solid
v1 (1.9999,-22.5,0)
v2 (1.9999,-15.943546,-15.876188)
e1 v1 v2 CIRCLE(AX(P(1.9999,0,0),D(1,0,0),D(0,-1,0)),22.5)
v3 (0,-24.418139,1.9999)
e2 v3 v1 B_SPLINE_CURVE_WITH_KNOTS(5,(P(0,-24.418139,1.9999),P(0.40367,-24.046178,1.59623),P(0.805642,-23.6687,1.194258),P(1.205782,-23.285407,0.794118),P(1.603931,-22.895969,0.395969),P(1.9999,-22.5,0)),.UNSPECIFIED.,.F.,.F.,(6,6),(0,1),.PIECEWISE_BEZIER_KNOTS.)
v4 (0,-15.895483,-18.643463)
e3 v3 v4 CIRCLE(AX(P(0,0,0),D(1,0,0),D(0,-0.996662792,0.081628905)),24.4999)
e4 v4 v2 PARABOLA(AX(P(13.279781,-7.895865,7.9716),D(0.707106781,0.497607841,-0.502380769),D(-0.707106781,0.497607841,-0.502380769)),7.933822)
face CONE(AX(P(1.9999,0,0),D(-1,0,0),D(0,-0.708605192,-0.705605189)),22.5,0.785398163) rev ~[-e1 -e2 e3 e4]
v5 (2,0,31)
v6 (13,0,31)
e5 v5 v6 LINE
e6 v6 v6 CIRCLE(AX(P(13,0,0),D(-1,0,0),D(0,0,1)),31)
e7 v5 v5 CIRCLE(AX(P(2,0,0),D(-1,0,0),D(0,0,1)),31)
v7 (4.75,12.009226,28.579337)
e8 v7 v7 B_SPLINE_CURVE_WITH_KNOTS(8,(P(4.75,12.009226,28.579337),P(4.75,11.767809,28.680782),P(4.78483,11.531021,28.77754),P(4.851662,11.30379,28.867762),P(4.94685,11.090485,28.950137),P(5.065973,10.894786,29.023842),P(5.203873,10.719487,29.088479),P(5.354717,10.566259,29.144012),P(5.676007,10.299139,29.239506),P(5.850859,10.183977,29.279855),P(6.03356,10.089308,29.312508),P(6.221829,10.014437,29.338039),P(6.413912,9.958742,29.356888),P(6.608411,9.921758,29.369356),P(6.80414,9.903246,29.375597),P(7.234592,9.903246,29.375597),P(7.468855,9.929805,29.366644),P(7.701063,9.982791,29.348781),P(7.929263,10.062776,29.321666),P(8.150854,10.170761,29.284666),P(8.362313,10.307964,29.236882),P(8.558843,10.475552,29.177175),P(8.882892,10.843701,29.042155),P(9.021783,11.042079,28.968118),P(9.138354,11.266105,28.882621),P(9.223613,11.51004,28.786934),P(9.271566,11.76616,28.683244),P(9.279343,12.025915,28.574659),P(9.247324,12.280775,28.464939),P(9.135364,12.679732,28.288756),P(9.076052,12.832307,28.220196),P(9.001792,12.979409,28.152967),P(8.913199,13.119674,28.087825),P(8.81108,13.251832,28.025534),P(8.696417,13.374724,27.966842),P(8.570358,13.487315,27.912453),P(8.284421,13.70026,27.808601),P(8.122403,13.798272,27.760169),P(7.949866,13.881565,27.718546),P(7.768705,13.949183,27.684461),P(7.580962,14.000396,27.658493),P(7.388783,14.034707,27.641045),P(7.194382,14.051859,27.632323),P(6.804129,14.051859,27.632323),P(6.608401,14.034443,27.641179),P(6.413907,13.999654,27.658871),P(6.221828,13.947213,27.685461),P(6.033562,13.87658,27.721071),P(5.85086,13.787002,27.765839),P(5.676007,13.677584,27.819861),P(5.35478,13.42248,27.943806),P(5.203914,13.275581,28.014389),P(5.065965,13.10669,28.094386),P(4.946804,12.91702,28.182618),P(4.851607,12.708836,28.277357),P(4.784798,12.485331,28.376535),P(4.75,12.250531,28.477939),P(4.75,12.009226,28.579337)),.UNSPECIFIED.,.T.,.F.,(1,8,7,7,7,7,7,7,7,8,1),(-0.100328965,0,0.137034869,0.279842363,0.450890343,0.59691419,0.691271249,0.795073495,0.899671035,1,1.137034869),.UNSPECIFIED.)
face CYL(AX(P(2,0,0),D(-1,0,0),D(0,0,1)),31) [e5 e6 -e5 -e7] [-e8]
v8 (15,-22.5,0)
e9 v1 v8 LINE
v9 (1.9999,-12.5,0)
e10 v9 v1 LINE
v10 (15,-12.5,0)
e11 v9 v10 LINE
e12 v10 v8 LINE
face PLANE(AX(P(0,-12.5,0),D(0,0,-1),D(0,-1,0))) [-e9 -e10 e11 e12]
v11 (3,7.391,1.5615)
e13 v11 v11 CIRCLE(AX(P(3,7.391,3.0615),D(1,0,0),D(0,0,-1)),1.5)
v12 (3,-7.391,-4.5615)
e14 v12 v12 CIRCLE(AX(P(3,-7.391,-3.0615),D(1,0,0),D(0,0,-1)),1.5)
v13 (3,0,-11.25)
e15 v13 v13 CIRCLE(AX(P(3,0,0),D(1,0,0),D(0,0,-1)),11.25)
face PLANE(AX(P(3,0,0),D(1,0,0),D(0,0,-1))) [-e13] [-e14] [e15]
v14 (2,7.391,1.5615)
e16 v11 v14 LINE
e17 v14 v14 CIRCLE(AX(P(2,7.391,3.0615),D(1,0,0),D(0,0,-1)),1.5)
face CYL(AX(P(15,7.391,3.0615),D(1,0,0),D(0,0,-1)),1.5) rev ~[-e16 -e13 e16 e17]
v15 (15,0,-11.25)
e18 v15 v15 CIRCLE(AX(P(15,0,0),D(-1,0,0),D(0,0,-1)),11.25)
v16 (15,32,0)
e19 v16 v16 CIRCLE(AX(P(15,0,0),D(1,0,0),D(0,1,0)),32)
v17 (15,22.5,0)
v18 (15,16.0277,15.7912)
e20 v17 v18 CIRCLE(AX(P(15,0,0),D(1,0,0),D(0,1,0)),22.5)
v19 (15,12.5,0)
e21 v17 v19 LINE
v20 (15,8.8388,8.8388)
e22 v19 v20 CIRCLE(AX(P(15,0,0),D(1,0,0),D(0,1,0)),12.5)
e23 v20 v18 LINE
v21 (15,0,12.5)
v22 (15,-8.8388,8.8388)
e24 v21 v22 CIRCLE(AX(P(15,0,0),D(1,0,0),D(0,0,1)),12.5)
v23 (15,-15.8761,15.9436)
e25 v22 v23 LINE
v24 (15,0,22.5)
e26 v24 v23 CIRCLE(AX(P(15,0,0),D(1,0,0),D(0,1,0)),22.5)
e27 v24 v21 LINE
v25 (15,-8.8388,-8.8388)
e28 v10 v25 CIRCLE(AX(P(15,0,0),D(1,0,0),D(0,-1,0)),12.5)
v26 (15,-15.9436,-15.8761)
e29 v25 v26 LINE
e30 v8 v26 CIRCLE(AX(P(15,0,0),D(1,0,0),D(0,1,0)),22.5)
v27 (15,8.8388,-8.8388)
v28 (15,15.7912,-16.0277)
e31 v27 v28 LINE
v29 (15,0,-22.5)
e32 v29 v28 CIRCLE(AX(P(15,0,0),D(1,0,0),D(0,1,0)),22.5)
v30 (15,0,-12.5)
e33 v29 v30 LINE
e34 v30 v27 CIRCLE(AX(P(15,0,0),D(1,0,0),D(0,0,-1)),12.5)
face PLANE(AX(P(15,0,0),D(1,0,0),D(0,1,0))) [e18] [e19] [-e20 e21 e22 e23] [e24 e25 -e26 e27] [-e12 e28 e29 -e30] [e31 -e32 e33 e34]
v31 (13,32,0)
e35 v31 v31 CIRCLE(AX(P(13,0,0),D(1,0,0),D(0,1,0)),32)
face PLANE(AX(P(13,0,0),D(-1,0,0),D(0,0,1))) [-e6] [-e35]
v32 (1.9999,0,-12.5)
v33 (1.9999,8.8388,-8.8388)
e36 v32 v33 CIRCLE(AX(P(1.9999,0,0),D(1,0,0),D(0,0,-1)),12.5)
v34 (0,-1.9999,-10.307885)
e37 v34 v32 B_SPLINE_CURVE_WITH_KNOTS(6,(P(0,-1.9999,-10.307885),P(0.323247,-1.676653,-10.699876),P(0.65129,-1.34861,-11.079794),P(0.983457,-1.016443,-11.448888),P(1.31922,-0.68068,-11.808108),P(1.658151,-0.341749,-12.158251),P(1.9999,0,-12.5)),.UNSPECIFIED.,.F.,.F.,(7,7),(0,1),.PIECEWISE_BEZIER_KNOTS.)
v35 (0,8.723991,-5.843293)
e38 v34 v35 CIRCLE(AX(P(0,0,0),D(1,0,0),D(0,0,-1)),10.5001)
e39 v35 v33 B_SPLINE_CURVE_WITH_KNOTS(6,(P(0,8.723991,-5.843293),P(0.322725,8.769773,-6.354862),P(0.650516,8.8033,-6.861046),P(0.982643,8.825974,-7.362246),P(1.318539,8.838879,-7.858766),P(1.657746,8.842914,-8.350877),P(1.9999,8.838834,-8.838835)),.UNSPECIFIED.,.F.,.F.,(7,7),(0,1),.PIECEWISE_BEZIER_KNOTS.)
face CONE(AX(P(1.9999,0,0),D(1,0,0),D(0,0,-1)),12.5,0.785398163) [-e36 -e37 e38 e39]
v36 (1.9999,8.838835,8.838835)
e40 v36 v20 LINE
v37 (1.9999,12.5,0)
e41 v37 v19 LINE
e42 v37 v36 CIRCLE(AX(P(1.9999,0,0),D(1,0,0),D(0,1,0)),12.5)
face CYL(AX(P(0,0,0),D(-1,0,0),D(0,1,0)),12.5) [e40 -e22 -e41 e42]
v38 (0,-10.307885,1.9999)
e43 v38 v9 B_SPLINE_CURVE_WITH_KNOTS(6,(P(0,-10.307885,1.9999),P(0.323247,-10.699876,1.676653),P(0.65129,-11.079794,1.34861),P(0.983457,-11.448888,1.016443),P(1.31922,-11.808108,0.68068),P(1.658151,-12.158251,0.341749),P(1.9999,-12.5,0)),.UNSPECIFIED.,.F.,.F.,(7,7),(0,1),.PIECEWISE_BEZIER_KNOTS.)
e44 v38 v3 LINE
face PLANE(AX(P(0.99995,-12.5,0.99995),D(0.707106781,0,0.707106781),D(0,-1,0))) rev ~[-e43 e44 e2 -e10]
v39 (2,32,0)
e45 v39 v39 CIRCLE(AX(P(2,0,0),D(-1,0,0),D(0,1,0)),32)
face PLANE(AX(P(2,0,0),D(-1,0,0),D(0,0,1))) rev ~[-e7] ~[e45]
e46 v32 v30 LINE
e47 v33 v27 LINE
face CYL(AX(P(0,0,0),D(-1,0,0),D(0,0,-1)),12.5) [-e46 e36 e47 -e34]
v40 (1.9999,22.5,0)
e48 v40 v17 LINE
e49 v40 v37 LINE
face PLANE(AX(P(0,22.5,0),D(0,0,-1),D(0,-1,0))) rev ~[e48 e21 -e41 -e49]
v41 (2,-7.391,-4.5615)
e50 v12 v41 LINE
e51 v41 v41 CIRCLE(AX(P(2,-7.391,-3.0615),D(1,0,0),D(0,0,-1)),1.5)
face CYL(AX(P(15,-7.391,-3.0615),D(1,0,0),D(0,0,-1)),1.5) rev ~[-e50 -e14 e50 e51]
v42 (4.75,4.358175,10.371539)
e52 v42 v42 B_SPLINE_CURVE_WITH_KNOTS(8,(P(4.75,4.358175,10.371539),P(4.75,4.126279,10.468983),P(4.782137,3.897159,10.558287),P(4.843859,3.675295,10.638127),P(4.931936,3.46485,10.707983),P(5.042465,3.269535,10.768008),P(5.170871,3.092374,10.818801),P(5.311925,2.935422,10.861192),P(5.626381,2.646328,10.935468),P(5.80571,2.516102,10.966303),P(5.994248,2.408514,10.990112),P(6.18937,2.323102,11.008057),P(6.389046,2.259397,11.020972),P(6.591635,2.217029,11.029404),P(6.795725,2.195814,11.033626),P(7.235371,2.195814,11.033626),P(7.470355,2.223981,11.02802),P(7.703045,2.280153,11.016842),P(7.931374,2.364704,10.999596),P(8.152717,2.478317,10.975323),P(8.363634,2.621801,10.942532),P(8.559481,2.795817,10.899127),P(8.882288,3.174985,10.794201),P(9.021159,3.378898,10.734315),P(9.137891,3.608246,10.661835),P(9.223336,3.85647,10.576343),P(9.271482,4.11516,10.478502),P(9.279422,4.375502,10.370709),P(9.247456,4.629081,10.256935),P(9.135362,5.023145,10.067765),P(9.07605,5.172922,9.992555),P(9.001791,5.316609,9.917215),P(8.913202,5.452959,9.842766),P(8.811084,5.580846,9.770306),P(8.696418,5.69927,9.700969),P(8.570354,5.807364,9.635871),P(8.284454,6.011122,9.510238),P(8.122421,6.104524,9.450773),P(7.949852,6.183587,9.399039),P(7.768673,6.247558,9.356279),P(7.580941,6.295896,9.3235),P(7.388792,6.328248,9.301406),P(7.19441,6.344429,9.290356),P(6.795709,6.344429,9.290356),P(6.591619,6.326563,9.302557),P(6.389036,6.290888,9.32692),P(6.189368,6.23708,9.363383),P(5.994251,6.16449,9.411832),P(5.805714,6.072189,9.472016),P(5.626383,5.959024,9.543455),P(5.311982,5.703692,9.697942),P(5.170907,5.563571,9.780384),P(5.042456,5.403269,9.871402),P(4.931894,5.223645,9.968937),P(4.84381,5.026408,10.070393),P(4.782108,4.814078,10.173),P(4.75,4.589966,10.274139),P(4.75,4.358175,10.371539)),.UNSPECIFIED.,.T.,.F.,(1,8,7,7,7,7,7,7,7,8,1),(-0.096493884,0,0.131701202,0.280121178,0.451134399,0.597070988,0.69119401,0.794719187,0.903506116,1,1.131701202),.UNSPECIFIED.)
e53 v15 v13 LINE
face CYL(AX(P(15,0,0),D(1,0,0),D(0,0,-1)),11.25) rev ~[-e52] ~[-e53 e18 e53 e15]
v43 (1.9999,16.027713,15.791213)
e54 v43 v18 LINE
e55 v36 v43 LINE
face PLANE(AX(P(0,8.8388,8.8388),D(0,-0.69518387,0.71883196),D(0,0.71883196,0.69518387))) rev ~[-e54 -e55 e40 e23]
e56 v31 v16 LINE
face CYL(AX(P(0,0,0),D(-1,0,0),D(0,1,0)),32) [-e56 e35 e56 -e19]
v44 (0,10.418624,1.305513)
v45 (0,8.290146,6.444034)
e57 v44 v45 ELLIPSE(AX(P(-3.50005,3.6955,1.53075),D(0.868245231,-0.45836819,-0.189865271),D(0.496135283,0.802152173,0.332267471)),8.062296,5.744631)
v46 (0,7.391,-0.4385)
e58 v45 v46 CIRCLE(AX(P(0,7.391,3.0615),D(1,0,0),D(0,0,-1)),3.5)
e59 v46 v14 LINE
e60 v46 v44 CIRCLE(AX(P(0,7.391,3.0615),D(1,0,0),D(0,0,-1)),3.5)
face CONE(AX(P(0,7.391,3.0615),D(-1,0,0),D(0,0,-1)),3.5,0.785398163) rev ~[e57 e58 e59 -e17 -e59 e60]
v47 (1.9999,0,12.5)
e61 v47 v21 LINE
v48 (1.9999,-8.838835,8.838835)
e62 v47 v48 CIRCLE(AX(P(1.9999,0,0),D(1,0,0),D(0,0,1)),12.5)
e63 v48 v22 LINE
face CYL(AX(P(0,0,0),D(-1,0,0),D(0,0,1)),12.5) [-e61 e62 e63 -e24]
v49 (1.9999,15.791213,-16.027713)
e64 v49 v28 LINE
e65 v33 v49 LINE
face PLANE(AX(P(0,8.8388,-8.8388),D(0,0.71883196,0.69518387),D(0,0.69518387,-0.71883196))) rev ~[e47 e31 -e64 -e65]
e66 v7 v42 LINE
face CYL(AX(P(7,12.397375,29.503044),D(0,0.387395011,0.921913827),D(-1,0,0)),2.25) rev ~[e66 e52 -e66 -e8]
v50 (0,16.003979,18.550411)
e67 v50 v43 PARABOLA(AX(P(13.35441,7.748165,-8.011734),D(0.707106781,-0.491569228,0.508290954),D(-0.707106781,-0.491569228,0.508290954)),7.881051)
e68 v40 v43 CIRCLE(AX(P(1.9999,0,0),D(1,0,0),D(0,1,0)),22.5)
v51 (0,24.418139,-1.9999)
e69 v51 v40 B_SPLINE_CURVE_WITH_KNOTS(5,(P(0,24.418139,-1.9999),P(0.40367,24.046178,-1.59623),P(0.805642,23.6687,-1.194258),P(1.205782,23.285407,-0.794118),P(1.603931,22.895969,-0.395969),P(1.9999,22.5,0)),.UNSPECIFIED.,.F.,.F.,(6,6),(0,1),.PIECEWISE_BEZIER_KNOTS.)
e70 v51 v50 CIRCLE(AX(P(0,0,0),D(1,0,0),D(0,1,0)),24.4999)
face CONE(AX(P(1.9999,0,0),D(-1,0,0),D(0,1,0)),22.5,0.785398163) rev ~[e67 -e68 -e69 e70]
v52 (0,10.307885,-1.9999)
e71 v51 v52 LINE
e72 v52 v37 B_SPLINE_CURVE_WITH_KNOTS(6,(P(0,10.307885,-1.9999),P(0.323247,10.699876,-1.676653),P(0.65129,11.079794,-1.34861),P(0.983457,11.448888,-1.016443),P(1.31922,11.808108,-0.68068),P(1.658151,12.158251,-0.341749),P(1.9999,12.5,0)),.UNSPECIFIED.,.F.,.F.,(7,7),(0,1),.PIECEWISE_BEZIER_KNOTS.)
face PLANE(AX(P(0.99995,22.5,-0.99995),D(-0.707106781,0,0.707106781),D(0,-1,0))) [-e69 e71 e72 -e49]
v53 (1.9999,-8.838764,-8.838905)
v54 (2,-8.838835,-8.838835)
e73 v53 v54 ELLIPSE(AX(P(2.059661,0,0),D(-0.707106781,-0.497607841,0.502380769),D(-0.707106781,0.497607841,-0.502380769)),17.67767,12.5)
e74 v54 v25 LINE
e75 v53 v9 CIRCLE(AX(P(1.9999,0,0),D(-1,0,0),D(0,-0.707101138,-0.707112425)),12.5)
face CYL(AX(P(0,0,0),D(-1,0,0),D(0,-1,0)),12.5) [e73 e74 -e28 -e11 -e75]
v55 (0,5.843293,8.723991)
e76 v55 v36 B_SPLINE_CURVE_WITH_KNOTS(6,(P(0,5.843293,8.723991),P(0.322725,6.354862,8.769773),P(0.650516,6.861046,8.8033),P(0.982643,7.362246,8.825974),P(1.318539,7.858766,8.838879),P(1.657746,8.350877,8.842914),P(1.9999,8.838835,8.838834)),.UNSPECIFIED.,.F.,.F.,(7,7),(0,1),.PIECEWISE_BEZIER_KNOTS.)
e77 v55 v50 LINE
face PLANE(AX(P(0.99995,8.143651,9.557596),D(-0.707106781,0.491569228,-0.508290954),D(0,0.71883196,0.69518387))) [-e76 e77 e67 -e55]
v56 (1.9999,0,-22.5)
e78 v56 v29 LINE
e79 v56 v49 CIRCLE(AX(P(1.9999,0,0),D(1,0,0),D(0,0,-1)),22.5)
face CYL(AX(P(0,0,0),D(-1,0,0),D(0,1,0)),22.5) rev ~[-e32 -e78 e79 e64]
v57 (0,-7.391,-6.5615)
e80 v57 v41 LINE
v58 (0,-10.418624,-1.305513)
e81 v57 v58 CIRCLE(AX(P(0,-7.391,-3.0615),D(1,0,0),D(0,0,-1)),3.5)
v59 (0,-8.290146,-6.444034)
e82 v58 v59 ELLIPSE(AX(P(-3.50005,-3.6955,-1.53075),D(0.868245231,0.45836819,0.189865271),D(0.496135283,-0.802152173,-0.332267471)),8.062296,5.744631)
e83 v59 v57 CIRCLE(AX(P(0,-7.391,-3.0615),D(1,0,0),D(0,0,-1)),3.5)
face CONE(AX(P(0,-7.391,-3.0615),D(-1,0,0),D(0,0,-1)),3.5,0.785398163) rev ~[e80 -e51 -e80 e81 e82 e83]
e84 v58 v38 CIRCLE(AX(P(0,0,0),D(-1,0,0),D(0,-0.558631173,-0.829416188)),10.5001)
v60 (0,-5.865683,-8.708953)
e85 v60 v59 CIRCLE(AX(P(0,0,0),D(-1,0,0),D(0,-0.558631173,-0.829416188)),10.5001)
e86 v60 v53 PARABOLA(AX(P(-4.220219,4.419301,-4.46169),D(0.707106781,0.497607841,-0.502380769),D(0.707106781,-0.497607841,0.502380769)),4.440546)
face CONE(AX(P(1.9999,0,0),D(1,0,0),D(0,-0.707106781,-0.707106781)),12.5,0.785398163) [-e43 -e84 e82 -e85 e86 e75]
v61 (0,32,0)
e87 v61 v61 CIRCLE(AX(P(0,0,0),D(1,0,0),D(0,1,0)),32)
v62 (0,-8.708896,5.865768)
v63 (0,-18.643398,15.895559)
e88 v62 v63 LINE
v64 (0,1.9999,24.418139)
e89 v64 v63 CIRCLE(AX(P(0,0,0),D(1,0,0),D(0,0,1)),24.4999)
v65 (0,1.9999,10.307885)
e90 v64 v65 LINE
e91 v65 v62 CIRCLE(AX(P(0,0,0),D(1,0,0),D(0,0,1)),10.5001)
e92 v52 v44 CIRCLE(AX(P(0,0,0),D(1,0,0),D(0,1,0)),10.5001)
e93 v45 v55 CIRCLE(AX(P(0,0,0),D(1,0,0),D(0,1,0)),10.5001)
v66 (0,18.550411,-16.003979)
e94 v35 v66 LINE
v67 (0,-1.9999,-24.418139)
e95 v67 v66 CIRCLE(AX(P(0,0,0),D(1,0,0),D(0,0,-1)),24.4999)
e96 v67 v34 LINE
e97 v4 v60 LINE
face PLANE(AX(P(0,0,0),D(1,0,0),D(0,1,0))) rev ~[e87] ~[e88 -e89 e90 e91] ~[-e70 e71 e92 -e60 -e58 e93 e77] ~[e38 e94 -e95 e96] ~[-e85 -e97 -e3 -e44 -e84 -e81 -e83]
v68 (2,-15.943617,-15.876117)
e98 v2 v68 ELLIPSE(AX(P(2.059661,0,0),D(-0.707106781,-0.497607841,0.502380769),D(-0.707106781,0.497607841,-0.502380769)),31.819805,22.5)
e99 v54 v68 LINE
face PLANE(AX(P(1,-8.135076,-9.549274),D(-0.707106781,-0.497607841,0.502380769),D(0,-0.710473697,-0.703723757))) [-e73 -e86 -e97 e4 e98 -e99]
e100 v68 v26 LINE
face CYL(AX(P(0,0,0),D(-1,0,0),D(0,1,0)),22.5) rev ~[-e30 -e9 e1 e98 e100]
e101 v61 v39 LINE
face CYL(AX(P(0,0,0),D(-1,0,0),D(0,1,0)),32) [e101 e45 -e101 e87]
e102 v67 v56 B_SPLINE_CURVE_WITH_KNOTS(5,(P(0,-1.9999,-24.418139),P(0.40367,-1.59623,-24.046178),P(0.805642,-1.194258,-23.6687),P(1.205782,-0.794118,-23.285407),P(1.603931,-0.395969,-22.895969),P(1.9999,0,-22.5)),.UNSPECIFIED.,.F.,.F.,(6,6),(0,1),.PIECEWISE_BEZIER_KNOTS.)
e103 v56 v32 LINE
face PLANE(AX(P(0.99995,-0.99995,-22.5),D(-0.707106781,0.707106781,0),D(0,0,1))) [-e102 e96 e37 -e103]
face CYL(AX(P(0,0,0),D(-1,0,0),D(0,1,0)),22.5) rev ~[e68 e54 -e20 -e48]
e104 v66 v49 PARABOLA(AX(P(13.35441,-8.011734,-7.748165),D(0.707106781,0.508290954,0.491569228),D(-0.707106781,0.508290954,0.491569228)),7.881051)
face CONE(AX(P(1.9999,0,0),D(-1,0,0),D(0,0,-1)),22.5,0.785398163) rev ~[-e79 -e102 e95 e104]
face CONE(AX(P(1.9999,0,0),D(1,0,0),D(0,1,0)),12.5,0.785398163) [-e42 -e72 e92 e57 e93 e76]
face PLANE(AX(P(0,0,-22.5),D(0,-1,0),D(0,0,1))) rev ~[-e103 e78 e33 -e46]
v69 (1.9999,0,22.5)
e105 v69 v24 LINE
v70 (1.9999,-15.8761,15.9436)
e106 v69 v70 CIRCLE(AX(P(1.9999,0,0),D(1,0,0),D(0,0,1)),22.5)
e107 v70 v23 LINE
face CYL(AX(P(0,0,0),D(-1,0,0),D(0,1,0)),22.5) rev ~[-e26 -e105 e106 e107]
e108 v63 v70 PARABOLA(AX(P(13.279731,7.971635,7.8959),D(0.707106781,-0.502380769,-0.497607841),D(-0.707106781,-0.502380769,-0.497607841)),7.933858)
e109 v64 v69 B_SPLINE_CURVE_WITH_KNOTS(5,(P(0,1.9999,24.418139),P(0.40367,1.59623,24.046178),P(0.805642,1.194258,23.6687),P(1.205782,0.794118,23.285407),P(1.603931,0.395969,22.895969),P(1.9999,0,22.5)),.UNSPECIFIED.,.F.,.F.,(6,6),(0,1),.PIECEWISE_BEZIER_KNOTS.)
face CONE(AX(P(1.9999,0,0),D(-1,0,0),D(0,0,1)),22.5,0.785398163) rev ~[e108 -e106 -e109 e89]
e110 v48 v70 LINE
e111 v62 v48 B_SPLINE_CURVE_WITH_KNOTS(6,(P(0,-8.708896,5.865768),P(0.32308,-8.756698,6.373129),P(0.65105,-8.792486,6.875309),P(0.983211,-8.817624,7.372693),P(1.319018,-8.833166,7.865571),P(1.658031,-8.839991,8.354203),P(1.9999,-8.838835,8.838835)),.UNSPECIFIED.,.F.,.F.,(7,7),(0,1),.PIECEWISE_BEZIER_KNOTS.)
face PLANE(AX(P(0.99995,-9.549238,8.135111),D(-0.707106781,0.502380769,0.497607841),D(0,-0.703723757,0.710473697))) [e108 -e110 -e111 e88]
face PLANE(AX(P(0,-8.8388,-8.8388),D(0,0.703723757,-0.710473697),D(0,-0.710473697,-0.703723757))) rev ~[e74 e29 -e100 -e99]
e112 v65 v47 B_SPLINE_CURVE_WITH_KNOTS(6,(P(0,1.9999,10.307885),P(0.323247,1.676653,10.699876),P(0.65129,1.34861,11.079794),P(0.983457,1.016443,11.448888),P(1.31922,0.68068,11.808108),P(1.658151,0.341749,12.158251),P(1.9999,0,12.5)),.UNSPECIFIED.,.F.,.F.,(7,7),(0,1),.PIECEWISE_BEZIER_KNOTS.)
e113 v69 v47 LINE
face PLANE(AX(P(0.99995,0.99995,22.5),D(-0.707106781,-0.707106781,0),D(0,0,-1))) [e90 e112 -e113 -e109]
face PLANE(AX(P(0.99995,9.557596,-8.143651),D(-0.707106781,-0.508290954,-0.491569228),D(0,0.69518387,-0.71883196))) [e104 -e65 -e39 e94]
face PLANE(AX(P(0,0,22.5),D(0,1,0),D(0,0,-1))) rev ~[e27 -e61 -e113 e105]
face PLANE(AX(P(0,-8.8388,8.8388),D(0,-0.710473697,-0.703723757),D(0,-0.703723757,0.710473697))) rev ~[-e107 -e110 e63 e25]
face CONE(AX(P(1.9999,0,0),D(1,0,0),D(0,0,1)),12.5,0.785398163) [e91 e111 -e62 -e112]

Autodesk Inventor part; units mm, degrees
ref_plane "XZ Plane" through (0, 0, 0) normal (0, 1, 0) x (-1, 0, 0)
ref_plane "XY Plane" through (0, 0, 0) normal (0, 0, 1) x (1, 0, 0)
sketch "Эскиз1" plane through (0, 0, 0) normal (1, 0, 0) x (0, 1, 0)
  circle A0 centre (0, 0) radius 33
  circle A1 centre (0, 0) radius 27.5
  line L0 (27.5, 0) -> (12.5, 0)
  line L1 (0, 27.5) -> (0, 12.5)
  arc A2 (0, -12.5) -> (12.5, 0) centre (0, 0) ccw
  arc A3 (-12.5, 0) -> (0, -12.5) centre (0, 0) ccw
  arc A4 (0, 12.5) -> (-12.5, 0) centre (0, 0) ccw
  arc A5 (12.5, 0) -> (0, 12.5) centre (0, 0) ccw
  line L2 (27.5, 0) -> (22.5, 0)
  line L3 (0, -27.5) -> (0, -22.5)
  line L4 (27.5, 0) -> (22.5, 0)
  line L5 (0, 27.5) -> (0, 22.5)
  line L6 (-27.5, 0) -> (-22.5, 0)
  circle A6 centre (0, 0) radius 22.5
  line L7 (-8.8388, -8.8388) -> (-15.9436, -15.8761)
  line L8 (-12.5, 0) -> (-22.5, 0)
  line L9 (-8.8388, 8.8388) -> (-15.8761, 15.9436)
  line L10 (8.8388, 8.8388) -> (16.0277, 15.7912)
  line L11 (12.5, 0) -> (22.5, 0)
  line L12 (0, 12.5) -> (0, 22.5)
  line L13 (8.8388, -8.8388) -> (15.7912, -16.0277)
  line L14 (0, -22.5) -> (0, -12.5)
  circle A7 centre (0, 0) radius 27.5
  circle A8 centre (0, 0) radius 32
  point P0 (-27.5, 0)
  point P1 (0, 22.5)
  point P2 (0, 22.5)
  point P3 (-22.5, 0)
  point P4 (-22.5, 0)
  dimension "d2" = 15
  dimension "d3" = 15
  dimension "d4" = 15
  dimension "d5" = 15
  dimension "d21" = 5
  dimension "d22" = 5
  dimension "d25" = 360
  dimension "d67" = 64
extrude "Выдавливание1" add sketch "Эскиз1" along normal blind 15 contours L0 A6 L1 A1 | A1 L3 A6 L0 | L1 A6 L6 A1 | A1 L6 A6 L3 | A6 L13 A2 L0 | L0 A5 L10 A6 | A6 L10 A5 L1 | L1 A4 L9 A6 | L14 A2 L13 A6 | A6 L7 A3 L14 | A2 A3 A4 A5 | L8 A3 L7 A6 | A6 L9 A4 L8 | A8
sketch "Эскиз5" plane through (15, 0, 0) normal (1, 0, 0) x (0, 0, -1)
  point P0 (0, 0)
extrude "Выдавливание3" cut sketch "Эскиз1" along normal blind 15 contours L0 A5 L10 A6 | L1 A4 L9 A6 | L14 A2 L13 A6 | L8 A3 L7 A6
sketch "Эскиз6" plane through (15, 0, 0) normal (1, 0, 0) x (0, 0, -1)
  circle A0 centre (0, 0) radius 11.25
  arc A1 (0, 12.5) -> (-8.8388, 8.8388) centre (0, 0) ccw projected
  arc A2 (0, 12.5) -> (-8.8388, 8.8388) centre (0, 0) ccw
  line L0 (0, 0) -> (-3.0615, 7.391) construction
  circle A3 centre (-3.0615, 7.391) radius 1.5
  circle A4 centre (-7.391, -3.0615) radius 1.5
  circle A5 centre (3.0615, -7.391) radius 1.5
  circle A6 centre (7.391, 3.0615) radius 1.5
  arc A7 (-3.0615, 7.391) -> (-7.391, -3.0615) centre (0, 0) ccw
  line L1 (-8.8388, 8.8388) -> (-22.3952, 22.8573) construction
  circle A8 centre (0, 0) radius 32 construction
  line L2 (-8.8388, 8.8388) -> (10.6622, 8.8388) construction
  arc A9 (-22.3952, 22.8573) -> (-32, 0) centre (0, 0) ccw construction
  line L3 (-29.5012, 12.3966) -> (-7.391, 3.0615)
  dimension "d31" = 22.5
  dimension "d72" = 8
  dimension "d74" = 3
  dimension "d77" = 360
  dimension "d79" = 134.04
extrude "Выдавливание4" [suppressed]
extrude "Выдавливание5" cut sketch "Эскиз6" against normal blind 12 contours A0 | A3 | A4 | A5 | A6
extrude "Выдавливание6" [suppressed]
chamfer "Фаска2" distance 2 angle 45 1 edges at (0, -12.3912, -12.3575)
chamfer "Фаска3" distance 2 angle 45 15 edges at (0, -20.7964, -8.5883) (0, -17.5, 0) (0, -11.5485, -4.7835) (0, 0, -17.5) (0, 8.5331, -20.8191) (0, 12.315, -12.4333) (0, 4.7835, -11.5485) (0, 17.5, 0) (0, 11.5485, 4.7835) (0, 20.8191, 8.5331) (0, 12.4333, 12.315) (0, 0, 17.5) (0, -4.7835, 11.5485) (0, -12.3575, 12.3912) (0, -8.5883, 20.7964)
ref_plane "РабПлоскость3" through (2, 0, 0) normal (1, 0, 0) x (0, 1, 0)
sketch "Эскиз10" plane through (2, 0, 0) normal (1, 0, 0) x (0, 1, 0)
  circle A0 centre (0, 0) radius 26.5
  circle A1 centre (0, 0) radius 27.5 projected
  circle A2 centre (0, 0) radius 26.5
  dimension "d66" = 53
sketch "Эскиз11" plane through (0, 0, 0) normal (-1, 0, 0) x (0, 0, 1)
  circle A0 centre (0, 0) radius 31
  circle A1 centre (0, 0) radius 32
  dimension "d68" = 62
extrude "Выдавливание9" cut sketch "Эскиз11" against normal blind 11 from surface at -2
extrude "Выдавливание10" cut sketch "Эскиз6" against normal blind 15 contours A3 | A5
chamfer "Фаска4" distance 2 angle 45 2 edges at (0, 7.391, 4.5615) (0, -7.391, -1.5615)
sketch "Эскиз12" plane through (15, 0, 0) normal (1, 0, 0) x (0, 0, -1)
  circle A0 centre (0, 0) radius 32 projected
  arc A1 (0, 12.5) -> (-8.8388, 8.8388) centre (0, 0) ccw projected
  line L0 (-8.8388, 8.8388) -> (-22.3952, 22.8573)
  circle A2 centre (0, 0) radius 32 projected
  line L1 (-8.8388, 8.8388) -> (10.6622, 8.8388) construction
  point P0 (0, 0)
  point P1 (-32, 0)
  dimension "d85" = 134.04
ref_plane "РабПлоскость4" through (15, 12.3966, 29.5012) normal (0, 0.387395, 0.9219138) x (-1, 0, 0)
sketch "Эскиз14" plane through (15, 12.3966, 29.5012) normal (0, 0.387395, 0.9219138) x (-1, 0, 0)
  circle A0 centre (8, 0) radius 2.25
  point P0 (15, 0)
  dimension "d87" = 4.5
extrude "Выдавливание11" cut sketch "Эскиз14" against normal blind 25
sketch "Эскиз15" plane through (3, 0, 0) normal (1, 0, 0) x (0, 0, -1)
  circle A0 centre (0, 0) radius 2
  dimension "d90" = 4
properties part number "колеса прототип"
